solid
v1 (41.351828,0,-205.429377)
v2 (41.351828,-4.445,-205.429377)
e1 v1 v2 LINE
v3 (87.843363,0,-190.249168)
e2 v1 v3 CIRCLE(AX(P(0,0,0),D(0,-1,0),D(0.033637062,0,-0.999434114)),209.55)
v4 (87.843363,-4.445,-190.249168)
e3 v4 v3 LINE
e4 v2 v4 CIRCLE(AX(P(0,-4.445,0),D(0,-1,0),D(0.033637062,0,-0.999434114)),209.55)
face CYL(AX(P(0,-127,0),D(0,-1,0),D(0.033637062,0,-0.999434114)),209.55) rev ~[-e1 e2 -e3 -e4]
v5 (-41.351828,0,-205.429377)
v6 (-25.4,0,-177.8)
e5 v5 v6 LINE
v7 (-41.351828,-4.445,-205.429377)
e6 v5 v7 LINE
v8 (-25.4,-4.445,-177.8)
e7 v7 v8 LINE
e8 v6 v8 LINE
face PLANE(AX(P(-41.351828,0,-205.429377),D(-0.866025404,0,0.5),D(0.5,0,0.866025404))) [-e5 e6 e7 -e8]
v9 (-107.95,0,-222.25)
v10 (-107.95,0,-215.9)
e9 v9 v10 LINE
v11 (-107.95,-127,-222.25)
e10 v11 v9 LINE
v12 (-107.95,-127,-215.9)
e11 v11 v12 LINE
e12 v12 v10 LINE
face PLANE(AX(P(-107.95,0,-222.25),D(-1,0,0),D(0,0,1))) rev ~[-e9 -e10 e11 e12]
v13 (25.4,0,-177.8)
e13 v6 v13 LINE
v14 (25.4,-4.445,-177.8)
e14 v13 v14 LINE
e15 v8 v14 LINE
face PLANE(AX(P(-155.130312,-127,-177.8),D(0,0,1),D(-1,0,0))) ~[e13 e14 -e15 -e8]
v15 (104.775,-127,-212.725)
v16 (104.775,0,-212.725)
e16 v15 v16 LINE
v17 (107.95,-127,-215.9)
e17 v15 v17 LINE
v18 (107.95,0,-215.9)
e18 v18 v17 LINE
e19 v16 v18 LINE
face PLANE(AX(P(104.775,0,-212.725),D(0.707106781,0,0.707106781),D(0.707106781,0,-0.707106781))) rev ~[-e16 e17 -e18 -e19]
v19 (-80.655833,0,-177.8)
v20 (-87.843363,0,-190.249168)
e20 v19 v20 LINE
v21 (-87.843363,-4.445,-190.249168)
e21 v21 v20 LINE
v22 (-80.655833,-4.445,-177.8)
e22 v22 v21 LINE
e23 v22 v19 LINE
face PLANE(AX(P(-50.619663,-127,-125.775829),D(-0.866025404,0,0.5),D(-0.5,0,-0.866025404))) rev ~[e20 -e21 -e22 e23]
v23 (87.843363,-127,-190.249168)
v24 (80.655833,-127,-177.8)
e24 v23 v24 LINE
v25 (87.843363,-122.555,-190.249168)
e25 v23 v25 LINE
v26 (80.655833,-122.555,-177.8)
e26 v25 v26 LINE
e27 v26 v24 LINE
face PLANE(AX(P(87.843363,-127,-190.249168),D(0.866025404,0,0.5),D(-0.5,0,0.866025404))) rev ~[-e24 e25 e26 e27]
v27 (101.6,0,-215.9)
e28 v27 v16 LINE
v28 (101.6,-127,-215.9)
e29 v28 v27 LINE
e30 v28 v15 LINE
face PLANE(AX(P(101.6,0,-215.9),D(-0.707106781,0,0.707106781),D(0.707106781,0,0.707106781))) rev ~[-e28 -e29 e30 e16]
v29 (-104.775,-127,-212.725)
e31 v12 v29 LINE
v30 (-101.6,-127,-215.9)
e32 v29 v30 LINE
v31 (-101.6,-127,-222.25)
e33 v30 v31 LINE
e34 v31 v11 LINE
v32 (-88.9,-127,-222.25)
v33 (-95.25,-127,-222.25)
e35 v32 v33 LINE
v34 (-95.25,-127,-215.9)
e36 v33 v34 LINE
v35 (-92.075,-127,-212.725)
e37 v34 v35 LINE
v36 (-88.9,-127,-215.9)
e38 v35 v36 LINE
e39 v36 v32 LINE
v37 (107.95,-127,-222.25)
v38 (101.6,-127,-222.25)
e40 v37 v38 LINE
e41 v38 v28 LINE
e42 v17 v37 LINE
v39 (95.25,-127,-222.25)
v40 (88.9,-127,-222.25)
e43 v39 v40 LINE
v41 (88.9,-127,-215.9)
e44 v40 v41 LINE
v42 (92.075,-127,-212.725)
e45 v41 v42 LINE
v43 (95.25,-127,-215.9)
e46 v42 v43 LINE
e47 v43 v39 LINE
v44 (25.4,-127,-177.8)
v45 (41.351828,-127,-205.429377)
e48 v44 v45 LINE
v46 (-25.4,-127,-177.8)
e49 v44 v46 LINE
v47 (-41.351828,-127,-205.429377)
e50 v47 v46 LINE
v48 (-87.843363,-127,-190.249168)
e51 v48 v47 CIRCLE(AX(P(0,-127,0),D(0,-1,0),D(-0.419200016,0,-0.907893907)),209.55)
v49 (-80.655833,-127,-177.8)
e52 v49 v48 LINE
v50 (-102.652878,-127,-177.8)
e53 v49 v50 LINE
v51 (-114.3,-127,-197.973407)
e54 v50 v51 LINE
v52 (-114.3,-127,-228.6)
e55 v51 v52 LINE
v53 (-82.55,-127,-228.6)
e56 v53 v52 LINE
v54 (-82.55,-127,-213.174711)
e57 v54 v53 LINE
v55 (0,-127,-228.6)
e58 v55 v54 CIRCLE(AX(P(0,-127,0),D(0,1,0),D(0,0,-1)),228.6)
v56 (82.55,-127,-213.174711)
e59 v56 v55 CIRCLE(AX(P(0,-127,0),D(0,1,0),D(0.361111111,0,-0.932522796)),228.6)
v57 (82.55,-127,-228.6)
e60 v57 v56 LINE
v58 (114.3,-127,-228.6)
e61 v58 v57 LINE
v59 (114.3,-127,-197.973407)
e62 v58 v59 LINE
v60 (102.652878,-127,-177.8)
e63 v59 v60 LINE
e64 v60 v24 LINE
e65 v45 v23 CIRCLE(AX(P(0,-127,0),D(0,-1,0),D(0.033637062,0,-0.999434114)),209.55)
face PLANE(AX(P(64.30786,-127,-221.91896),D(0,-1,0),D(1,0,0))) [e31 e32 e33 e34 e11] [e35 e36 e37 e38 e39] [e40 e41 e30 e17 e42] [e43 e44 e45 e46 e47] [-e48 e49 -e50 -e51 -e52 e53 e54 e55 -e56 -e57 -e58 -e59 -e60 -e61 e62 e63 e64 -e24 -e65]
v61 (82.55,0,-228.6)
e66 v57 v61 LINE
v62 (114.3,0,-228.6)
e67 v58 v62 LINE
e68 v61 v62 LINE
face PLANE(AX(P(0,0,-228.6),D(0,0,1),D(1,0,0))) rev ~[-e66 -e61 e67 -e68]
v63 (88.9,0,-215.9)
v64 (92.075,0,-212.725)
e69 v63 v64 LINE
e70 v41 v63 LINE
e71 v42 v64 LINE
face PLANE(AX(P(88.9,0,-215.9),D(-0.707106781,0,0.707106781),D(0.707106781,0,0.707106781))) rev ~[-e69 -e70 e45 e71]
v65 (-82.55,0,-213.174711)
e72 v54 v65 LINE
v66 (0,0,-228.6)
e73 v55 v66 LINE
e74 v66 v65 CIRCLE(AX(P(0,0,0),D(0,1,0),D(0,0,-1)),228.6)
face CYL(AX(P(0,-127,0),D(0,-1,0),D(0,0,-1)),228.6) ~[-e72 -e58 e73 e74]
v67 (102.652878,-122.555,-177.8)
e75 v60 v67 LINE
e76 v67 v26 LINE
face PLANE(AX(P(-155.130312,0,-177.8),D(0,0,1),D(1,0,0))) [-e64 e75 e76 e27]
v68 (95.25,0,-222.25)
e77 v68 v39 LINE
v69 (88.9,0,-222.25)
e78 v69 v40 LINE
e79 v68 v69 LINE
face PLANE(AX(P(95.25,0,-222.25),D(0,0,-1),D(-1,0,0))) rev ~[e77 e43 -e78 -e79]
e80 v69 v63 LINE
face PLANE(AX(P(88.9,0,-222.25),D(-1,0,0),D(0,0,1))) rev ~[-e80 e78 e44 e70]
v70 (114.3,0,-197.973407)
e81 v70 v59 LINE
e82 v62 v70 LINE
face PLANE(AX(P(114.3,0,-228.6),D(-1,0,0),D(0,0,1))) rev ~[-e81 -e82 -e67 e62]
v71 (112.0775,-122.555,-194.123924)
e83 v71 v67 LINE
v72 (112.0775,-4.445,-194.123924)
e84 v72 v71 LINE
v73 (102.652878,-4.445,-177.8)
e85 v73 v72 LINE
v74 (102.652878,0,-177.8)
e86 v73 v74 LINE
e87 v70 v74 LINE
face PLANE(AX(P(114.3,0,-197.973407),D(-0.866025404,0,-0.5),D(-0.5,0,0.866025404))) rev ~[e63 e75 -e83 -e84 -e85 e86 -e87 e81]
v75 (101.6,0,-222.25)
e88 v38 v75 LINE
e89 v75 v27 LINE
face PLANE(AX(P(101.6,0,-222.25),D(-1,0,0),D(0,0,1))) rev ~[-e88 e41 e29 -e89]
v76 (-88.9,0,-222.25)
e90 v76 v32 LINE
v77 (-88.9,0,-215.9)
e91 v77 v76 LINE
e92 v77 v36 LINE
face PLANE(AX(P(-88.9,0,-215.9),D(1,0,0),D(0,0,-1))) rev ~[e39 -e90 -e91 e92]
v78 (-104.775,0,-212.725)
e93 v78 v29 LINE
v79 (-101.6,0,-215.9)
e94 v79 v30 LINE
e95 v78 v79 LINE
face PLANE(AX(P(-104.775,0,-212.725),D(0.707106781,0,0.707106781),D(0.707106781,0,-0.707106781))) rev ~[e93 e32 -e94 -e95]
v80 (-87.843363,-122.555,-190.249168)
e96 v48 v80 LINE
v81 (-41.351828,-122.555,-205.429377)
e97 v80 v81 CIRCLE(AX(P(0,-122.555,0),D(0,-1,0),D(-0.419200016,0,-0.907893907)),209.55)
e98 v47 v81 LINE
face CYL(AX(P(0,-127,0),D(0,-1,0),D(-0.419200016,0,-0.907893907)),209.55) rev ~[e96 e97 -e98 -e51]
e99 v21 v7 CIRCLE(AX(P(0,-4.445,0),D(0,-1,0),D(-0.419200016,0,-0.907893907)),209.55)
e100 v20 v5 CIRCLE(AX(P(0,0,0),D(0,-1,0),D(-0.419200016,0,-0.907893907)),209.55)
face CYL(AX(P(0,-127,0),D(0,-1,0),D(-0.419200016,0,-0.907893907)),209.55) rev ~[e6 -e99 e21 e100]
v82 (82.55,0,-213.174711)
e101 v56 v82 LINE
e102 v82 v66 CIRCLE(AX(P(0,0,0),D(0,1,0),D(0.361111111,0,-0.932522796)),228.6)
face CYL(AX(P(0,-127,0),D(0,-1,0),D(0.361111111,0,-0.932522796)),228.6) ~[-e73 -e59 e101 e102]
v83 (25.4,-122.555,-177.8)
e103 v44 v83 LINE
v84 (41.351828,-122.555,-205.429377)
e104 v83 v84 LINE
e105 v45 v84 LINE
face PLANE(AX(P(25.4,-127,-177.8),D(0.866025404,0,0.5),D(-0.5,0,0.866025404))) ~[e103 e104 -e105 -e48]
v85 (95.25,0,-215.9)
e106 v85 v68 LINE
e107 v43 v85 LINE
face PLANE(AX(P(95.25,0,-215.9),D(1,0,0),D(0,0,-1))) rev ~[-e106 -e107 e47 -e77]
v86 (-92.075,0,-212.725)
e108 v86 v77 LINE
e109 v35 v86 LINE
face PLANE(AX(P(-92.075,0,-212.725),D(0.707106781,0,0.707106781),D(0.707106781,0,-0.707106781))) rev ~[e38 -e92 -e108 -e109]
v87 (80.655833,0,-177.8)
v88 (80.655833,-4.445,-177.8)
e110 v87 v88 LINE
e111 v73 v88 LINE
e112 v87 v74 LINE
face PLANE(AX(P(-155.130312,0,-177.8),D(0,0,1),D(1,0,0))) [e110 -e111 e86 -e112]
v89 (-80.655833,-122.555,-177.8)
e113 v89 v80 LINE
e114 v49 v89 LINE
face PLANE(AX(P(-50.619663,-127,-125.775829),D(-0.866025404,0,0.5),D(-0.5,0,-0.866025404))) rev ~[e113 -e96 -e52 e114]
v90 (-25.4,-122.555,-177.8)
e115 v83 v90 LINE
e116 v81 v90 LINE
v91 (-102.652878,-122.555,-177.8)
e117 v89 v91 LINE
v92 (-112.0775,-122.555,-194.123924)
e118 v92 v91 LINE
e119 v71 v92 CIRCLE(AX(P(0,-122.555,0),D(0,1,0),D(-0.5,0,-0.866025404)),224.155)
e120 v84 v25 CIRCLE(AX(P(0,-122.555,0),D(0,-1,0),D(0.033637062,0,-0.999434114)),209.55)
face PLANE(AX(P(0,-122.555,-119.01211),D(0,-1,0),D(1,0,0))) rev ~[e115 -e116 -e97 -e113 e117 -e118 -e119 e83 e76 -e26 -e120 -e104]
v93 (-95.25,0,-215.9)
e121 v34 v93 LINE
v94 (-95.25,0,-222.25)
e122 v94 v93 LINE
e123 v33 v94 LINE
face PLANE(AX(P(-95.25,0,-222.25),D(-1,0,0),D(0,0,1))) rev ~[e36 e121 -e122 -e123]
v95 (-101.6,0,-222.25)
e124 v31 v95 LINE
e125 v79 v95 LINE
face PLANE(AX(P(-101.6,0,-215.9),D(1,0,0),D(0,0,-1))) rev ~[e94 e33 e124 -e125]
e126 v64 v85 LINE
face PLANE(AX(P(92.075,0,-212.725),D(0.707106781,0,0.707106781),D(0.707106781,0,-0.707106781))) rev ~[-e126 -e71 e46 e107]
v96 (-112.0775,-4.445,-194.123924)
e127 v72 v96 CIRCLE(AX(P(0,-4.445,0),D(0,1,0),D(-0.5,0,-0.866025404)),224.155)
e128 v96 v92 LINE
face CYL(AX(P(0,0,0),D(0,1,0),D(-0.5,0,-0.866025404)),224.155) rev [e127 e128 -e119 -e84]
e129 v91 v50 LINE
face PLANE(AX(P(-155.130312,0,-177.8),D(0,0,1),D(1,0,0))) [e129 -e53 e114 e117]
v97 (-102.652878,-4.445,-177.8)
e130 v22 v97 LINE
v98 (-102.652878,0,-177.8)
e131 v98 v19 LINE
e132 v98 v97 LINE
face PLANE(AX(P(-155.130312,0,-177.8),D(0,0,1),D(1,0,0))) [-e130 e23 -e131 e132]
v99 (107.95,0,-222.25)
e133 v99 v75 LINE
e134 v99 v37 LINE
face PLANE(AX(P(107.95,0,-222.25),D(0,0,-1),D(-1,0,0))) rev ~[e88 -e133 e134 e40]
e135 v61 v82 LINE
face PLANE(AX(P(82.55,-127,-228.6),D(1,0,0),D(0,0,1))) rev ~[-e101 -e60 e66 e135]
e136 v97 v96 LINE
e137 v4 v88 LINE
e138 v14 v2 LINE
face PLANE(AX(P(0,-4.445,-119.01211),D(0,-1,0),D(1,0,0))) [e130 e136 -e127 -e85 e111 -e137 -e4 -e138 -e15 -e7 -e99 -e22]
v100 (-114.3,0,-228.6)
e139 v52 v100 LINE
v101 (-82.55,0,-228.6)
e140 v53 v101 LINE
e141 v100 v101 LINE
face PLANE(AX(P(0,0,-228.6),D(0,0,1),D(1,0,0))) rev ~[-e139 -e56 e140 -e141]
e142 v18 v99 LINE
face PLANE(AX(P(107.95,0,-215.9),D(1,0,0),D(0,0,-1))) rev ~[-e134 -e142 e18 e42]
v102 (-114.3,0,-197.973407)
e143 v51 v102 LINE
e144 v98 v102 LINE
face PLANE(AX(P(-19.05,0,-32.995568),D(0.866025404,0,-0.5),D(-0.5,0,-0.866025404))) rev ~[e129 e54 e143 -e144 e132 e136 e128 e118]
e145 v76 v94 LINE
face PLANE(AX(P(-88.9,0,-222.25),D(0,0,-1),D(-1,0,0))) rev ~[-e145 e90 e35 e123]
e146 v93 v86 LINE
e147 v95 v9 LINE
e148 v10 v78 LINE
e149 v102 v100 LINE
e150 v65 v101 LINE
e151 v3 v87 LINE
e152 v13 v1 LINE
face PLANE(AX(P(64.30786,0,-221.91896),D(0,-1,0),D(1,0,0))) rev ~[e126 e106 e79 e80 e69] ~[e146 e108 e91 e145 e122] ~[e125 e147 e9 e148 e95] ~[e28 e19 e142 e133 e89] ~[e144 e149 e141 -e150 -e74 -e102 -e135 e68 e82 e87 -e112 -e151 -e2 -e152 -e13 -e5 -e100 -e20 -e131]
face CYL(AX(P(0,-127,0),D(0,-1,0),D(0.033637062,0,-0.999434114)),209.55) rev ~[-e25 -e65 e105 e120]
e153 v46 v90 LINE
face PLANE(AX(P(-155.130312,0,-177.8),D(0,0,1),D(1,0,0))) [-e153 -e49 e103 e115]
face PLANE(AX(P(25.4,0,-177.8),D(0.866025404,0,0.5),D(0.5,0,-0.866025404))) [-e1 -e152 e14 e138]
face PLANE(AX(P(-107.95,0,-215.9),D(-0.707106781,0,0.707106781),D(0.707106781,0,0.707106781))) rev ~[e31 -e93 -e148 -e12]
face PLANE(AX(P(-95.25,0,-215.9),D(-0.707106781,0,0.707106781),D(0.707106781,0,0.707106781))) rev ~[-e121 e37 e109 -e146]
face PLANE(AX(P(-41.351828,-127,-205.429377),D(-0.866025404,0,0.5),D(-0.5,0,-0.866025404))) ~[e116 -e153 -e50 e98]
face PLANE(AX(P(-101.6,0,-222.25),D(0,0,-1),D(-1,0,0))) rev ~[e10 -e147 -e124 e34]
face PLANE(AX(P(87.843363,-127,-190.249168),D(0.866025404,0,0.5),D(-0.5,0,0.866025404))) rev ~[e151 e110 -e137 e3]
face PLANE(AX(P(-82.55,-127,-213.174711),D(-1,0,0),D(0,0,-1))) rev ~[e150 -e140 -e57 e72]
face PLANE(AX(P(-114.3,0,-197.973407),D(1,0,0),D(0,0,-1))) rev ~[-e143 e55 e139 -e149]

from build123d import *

# Parameters (mm, degrees)
F1_DEPTH  = 127
F2_T      = 4.445
F3_R      = 9.525
F4_DEPTH  = 127
F6_DEPTH  = 127
F8_DEPTH  = 154.94
F10_DEPTH = 4.445
F14_DEPTH = 127


# Not quite as in the source:
# - a shell that OpenCascade refuses in one call is made with other operations: the cavity is built on its own and cut out


with BuildPart() as f1:
    # F0 (on Front) → F1 (new body)
    with BuildSketch(Plane.XZ):
        with BuildLine():
            Line((-19.05, -32.9955678842), (-114.3, -197.9734073051))
            ThreePointArc((-114.3, -197.9734073051), (0, -228.6), (114.3, -197.9734073051))
            Line((114.3, -197.9734073051), (19.05, -32.9955678842))
            ThreePointArc((19.05, -32.9955678842), (32.9955678842, -19.05), (38.1, 0))
            ThreePointArc((38.1, 0), (0, 38.1), (-38.1, 0))
            ThreePointArc((-38.1, 0), (-32.9955678842, -19.05), (-19.05, -32.9955678842))
        make_face()
    extrude(amount=F1_DEPTH)

    # F2: shell of thickness 4.445, made by hand


with BuildPart() as f2_core1:
    # F2_t2: copy of F1
    add(f1.part)

    # the walls: a layer under each face that stays
    f2_faces = [f2_core1.faces().sort_by_distance(p)[0] for p in [
        (0, -127, -95.25),
        (0, 0, -95.25),
        (0, -63.5, -228.6),
        (-32.9955678842, -63.5, -19.05),
    ]]
    thicken(f2_faces, amount=-F2_T, mode=Mode.SUBTRACT)


with BuildPart() as f1_1:
    add(f1.part)

    # what is left inside the walls is the cavity
    f2_cavity = [f2_core1.part.solids().sort_by_distance(p)[0] for p in [
        (0, -122.51055, -136.736667),
    ]]
    add(f2_cavity, mode=Mode.SUBTRACT)

    # F3 (on face) → F4 (cut, through all)
    with BuildSketch(Plane.XZ.offset(127)):
        with BuildLine():
            Line((-50.6196632626, -125.7758286329), (-87.8433632626, -190.2491682786))
            ThreePointArc((-87.8433632626, -190.2491682786), (-48.4057129805, -203.8825383667), (-7.0486462544, -209.4314185741))
            Line((-7.0486462544, -209.4314185741), (-7.0486462544, -169.3468456411))
            Line((-7.0486462544, -169.3468456411), (-50.6196632626, -125.7758286329))
        make_face()
        with BuildLine():
            Line((87.8433632626, -190.2491682786), (50.6196632626, -125.7758286329))
            Line((50.6196632626, -125.7758286329), (7.0486462544, -169.3468456411))
            Line((7.0486462544, -169.3468456411), (7.0486462544, -209.4314185741))
            ThreePointArc((7.0486462544, -209.4314185741), (48.4057129805, -203.8825383667), (87.8433632626, -190.2491682786))
        make_face()
        with BuildLine():
            Line((44.2696632626, -114.7773060049), (7.0486462544, -50.3086134373))
            Line((7.0486462544, -50.3086134373), (7.0486462544, -125.901221947))
            ThreePointArc((7.0486462544, -125.901221947), (11.356209976, -128.3041542134), (14.9024469628, -131.7324762409))
            Line((14.9024469628, -131.7324762409), (44.2696632626, -114.7773060049))
        make_face()
        with BuildLine():
            Line((-7.0486462544, -125.901221947), (-7.0486462544, -50.3086134373))
            Line((-7.0486462544, -50.3086134373), (-44.2696632626, -114.7773060049))
            Line((-44.2696632626, -114.7773060049), (-14.9024469628, -131.7324762409))
            ThreePointArc((-14.9024469628, -131.7324762409), (-11.356209976, -128.3041542134), (-7.0486462544, -125.901221947))
        make_face()
        Circle(F3_R)
    extrude(amount=-F4_DEPTH, mode=Mode.SUBTRACT)

    # F5 (on Front) → F6 (join, through all)
    with BuildSketch(Plane.XZ):
        with BuildLine():
            ThreePointArc((114.3, -197.9734073051), (59.1660337104, -220.8106438897), (0, -228.6))
            Line((0, -228.6), (114.3, -228.6))
            Line((114.3, -228.6), (114.3, -197.9734073051))
        make_face()
        Polygon((95.25, -222.25), (88.9, -222.25), (88.9, -215.9), (92.075, -212.725), (95.25, -215.9), align=None, mode=Mode.SUBTRACT)
        Polygon((107.95, -215.9), (107.95, -222.25), (101.6, -222.25), (101.6, -215.9), (104.775, -212.725), align=None, mode=Mode.SUBTRACT)
        with BuildLine():
            Line((-114.3, -228.6), (0, -228.6))
            ThreePointArc((0, -228.6), (-59.1660337104, -220.8106438897), (-114.3, -197.9734073051))
            Line((-114.3, -197.9734073051), (-114.3, -228.6))
        make_face()
        Polygon((-104.775, -212.725), (-101.6, -215.9), (-101.6, -222.25), (-107.95, -222.25), (-107.95, -215.9), align=None, mode=Mode.SUBTRACT)
        Polygon((-92.075, -212.725), (-88.9, -215.9), (-88.9, -222.25), (-95.25, -222.25), (-95.25, -215.9), align=None, mode=Mode.SUBTRACT)
    extrude(amount=F6_DEPTH)

    # F7 (on Front) → F8 (cut)
    with BuildSketch(Plane.XZ):
        Polygon((-155.1303118467, -177.8), (0, -177.8), (122.5007101893, -177.8), (122.5007101893, 99.952660501), (-155.1303118467, 97.6831391454), align=None)
    extrude(amount=F8_DEPTH, mode=Mode.SUBTRACT)

    # F9 (on face) → F10 (join, through all)
    with BuildSketch(Plane(origin=(0, 0, 0), x_dir=(-1, 0, 0), z_dir=(0, 1, 0))):
        with BuildLine():
            ThreePointArc((-41.3518280797, -205.4293767076), (-65.0419791249, -199.2002596673), (-87.8433632626, -190.2491682786))
            Line((-87.8433632626, -190.2491682786), (-80.6558326058, -177.8))
            Line((-80.6558326058, -177.8), (-102.6528778619, -177.8))
            Line((-102.6528778619, -177.8), (-114.3, -197.9734073051))
            Line((-114.3, -197.9734073051), (-114.3, -228.6))
            Line((-114.3, -228.6), (114.3, -228.6))
            Line((114.3, -228.6), (114.3, -197.9734073051))
            Line((114.3, -197.9734073051), (102.6528778619, -177.8))
            Line((102.6528778619, -177.8), (80.6558326058, -177.8))
            Line((80.6558326058, -177.8), (87.8433632626, -190.2491682786))
            ThreePointArc((87.8433632626, -190.2491682786), (65.0419791249, -199.2002596673), (41.3518280797, -205.4293767076))
            ThreePointArc((41.3518280797, -205.4293767076), (24.2828244592, -208.1382880113), (7.0486462544, -209.4314185741))
            Line((7.0486462544, -209.4314185741), (7.0486462544, -177.8))
            Line((7.0486462544, -177.8), (0, -177.8))
            Line((0, -177.8), (-7.0486462544, -177.8))
            Line((-7.0486462544, -177.8), (-7.0486462544, -209.4314185741))
            ThreePointArc((-7.0486462544, -209.4314185741), (-24.2828244592, -208.1382880113), (-41.3518280797, -205.4293767076))
        make_face()
        Polygon((-107.95, -222.25), (-107.95, -215.9), (-104.775, -212.725), (-101.6, -215.9), (-101.6, -222.25), align=None, mode=Mode.SUBTRACT)
        Polygon((-88.9, -215.9), (-88.9, -222.25), (-95.25, -222.25), (-95.25, -215.9), (-92.075, -212.725), align=None, mode=Mode.SUBTRACT)
        Polygon((88.9, -215.9), (92.075, -212.725), (95.25, -215.9), (95.25, -222.25), (88.9, -222.25), align=None, mode=Mode.SUBTRACT)
        Polygon((101.6, -222.25), (101.6, -215.9), (104.775, -212.725), (107.95, -215.9), (107.95, -222.25), align=None, mode=Mode.SUBTRACT)
        with BuildLine():
            Line((-25.4, -177.8), (-41.3518280797, -205.4293767076))
            ThreePointArc((-41.3518280797, -205.4293767076), (-24.2828244592, -208.1382880113), (-7.0486462544, -209.4314185741))
            Line((-7.0486462544, -209.4314185741), (-7.0486462544, -177.8))
            Line((-7.0486462544, -177.8), (-25.4, -177.8))
        make_face()
        with BuildLine():
            Line((25.4, -177.8), (7.0486462544, -177.8))
            Line((7.0486462544, -177.8), (7.0486462544, -209.4314185741))
            ThreePointArc((7.0486462544, -209.4314185741), (24.2828244592, -208.1382880113), (41.3518280797, -205.4293767076))
            Line((41.3518280797, -205.4293767076), (25.4, -177.8))
        make_face()
    extrude(amount=-F10_DEPTH)

    # F12: F1 across plane


with BuildPart() as f1_2:
    add(f1_1.part)
    add(f1_1.part.mirror(Plane(origin=(0, -63.5, -104.9820841324), x_dir=(1, 0, 0), z_dir=(0, -1, 0))))

    # F13 (on face) → F14 (cut, through all)
    with BuildSketch(Plane.XZ.offset(127)):
        with BuildLine():
            ThreePointArc((0, -228.6), (-41.9894094809, -224.7105905191), (-82.55, -213.1747112113))
            Line((-82.55, -213.1747112113), (-82.55, -228.6))
            Line((-82.55, -228.6), (0, -228.6))
        make_face()
        with BuildLine():
            ThreePointArc((82.55, -213.1747112113), (41.9894094809, -224.7105905191), (0, -228.6))
            Line((0, -228.6), (82.55, -228.6))
            Line((82.55, -228.6), (82.55, -213.1747112113))
        make_face()
    extrude(amount=-F14_DEPTH, mode=Mode.SUBTRACT)


solid = f1_2.part
